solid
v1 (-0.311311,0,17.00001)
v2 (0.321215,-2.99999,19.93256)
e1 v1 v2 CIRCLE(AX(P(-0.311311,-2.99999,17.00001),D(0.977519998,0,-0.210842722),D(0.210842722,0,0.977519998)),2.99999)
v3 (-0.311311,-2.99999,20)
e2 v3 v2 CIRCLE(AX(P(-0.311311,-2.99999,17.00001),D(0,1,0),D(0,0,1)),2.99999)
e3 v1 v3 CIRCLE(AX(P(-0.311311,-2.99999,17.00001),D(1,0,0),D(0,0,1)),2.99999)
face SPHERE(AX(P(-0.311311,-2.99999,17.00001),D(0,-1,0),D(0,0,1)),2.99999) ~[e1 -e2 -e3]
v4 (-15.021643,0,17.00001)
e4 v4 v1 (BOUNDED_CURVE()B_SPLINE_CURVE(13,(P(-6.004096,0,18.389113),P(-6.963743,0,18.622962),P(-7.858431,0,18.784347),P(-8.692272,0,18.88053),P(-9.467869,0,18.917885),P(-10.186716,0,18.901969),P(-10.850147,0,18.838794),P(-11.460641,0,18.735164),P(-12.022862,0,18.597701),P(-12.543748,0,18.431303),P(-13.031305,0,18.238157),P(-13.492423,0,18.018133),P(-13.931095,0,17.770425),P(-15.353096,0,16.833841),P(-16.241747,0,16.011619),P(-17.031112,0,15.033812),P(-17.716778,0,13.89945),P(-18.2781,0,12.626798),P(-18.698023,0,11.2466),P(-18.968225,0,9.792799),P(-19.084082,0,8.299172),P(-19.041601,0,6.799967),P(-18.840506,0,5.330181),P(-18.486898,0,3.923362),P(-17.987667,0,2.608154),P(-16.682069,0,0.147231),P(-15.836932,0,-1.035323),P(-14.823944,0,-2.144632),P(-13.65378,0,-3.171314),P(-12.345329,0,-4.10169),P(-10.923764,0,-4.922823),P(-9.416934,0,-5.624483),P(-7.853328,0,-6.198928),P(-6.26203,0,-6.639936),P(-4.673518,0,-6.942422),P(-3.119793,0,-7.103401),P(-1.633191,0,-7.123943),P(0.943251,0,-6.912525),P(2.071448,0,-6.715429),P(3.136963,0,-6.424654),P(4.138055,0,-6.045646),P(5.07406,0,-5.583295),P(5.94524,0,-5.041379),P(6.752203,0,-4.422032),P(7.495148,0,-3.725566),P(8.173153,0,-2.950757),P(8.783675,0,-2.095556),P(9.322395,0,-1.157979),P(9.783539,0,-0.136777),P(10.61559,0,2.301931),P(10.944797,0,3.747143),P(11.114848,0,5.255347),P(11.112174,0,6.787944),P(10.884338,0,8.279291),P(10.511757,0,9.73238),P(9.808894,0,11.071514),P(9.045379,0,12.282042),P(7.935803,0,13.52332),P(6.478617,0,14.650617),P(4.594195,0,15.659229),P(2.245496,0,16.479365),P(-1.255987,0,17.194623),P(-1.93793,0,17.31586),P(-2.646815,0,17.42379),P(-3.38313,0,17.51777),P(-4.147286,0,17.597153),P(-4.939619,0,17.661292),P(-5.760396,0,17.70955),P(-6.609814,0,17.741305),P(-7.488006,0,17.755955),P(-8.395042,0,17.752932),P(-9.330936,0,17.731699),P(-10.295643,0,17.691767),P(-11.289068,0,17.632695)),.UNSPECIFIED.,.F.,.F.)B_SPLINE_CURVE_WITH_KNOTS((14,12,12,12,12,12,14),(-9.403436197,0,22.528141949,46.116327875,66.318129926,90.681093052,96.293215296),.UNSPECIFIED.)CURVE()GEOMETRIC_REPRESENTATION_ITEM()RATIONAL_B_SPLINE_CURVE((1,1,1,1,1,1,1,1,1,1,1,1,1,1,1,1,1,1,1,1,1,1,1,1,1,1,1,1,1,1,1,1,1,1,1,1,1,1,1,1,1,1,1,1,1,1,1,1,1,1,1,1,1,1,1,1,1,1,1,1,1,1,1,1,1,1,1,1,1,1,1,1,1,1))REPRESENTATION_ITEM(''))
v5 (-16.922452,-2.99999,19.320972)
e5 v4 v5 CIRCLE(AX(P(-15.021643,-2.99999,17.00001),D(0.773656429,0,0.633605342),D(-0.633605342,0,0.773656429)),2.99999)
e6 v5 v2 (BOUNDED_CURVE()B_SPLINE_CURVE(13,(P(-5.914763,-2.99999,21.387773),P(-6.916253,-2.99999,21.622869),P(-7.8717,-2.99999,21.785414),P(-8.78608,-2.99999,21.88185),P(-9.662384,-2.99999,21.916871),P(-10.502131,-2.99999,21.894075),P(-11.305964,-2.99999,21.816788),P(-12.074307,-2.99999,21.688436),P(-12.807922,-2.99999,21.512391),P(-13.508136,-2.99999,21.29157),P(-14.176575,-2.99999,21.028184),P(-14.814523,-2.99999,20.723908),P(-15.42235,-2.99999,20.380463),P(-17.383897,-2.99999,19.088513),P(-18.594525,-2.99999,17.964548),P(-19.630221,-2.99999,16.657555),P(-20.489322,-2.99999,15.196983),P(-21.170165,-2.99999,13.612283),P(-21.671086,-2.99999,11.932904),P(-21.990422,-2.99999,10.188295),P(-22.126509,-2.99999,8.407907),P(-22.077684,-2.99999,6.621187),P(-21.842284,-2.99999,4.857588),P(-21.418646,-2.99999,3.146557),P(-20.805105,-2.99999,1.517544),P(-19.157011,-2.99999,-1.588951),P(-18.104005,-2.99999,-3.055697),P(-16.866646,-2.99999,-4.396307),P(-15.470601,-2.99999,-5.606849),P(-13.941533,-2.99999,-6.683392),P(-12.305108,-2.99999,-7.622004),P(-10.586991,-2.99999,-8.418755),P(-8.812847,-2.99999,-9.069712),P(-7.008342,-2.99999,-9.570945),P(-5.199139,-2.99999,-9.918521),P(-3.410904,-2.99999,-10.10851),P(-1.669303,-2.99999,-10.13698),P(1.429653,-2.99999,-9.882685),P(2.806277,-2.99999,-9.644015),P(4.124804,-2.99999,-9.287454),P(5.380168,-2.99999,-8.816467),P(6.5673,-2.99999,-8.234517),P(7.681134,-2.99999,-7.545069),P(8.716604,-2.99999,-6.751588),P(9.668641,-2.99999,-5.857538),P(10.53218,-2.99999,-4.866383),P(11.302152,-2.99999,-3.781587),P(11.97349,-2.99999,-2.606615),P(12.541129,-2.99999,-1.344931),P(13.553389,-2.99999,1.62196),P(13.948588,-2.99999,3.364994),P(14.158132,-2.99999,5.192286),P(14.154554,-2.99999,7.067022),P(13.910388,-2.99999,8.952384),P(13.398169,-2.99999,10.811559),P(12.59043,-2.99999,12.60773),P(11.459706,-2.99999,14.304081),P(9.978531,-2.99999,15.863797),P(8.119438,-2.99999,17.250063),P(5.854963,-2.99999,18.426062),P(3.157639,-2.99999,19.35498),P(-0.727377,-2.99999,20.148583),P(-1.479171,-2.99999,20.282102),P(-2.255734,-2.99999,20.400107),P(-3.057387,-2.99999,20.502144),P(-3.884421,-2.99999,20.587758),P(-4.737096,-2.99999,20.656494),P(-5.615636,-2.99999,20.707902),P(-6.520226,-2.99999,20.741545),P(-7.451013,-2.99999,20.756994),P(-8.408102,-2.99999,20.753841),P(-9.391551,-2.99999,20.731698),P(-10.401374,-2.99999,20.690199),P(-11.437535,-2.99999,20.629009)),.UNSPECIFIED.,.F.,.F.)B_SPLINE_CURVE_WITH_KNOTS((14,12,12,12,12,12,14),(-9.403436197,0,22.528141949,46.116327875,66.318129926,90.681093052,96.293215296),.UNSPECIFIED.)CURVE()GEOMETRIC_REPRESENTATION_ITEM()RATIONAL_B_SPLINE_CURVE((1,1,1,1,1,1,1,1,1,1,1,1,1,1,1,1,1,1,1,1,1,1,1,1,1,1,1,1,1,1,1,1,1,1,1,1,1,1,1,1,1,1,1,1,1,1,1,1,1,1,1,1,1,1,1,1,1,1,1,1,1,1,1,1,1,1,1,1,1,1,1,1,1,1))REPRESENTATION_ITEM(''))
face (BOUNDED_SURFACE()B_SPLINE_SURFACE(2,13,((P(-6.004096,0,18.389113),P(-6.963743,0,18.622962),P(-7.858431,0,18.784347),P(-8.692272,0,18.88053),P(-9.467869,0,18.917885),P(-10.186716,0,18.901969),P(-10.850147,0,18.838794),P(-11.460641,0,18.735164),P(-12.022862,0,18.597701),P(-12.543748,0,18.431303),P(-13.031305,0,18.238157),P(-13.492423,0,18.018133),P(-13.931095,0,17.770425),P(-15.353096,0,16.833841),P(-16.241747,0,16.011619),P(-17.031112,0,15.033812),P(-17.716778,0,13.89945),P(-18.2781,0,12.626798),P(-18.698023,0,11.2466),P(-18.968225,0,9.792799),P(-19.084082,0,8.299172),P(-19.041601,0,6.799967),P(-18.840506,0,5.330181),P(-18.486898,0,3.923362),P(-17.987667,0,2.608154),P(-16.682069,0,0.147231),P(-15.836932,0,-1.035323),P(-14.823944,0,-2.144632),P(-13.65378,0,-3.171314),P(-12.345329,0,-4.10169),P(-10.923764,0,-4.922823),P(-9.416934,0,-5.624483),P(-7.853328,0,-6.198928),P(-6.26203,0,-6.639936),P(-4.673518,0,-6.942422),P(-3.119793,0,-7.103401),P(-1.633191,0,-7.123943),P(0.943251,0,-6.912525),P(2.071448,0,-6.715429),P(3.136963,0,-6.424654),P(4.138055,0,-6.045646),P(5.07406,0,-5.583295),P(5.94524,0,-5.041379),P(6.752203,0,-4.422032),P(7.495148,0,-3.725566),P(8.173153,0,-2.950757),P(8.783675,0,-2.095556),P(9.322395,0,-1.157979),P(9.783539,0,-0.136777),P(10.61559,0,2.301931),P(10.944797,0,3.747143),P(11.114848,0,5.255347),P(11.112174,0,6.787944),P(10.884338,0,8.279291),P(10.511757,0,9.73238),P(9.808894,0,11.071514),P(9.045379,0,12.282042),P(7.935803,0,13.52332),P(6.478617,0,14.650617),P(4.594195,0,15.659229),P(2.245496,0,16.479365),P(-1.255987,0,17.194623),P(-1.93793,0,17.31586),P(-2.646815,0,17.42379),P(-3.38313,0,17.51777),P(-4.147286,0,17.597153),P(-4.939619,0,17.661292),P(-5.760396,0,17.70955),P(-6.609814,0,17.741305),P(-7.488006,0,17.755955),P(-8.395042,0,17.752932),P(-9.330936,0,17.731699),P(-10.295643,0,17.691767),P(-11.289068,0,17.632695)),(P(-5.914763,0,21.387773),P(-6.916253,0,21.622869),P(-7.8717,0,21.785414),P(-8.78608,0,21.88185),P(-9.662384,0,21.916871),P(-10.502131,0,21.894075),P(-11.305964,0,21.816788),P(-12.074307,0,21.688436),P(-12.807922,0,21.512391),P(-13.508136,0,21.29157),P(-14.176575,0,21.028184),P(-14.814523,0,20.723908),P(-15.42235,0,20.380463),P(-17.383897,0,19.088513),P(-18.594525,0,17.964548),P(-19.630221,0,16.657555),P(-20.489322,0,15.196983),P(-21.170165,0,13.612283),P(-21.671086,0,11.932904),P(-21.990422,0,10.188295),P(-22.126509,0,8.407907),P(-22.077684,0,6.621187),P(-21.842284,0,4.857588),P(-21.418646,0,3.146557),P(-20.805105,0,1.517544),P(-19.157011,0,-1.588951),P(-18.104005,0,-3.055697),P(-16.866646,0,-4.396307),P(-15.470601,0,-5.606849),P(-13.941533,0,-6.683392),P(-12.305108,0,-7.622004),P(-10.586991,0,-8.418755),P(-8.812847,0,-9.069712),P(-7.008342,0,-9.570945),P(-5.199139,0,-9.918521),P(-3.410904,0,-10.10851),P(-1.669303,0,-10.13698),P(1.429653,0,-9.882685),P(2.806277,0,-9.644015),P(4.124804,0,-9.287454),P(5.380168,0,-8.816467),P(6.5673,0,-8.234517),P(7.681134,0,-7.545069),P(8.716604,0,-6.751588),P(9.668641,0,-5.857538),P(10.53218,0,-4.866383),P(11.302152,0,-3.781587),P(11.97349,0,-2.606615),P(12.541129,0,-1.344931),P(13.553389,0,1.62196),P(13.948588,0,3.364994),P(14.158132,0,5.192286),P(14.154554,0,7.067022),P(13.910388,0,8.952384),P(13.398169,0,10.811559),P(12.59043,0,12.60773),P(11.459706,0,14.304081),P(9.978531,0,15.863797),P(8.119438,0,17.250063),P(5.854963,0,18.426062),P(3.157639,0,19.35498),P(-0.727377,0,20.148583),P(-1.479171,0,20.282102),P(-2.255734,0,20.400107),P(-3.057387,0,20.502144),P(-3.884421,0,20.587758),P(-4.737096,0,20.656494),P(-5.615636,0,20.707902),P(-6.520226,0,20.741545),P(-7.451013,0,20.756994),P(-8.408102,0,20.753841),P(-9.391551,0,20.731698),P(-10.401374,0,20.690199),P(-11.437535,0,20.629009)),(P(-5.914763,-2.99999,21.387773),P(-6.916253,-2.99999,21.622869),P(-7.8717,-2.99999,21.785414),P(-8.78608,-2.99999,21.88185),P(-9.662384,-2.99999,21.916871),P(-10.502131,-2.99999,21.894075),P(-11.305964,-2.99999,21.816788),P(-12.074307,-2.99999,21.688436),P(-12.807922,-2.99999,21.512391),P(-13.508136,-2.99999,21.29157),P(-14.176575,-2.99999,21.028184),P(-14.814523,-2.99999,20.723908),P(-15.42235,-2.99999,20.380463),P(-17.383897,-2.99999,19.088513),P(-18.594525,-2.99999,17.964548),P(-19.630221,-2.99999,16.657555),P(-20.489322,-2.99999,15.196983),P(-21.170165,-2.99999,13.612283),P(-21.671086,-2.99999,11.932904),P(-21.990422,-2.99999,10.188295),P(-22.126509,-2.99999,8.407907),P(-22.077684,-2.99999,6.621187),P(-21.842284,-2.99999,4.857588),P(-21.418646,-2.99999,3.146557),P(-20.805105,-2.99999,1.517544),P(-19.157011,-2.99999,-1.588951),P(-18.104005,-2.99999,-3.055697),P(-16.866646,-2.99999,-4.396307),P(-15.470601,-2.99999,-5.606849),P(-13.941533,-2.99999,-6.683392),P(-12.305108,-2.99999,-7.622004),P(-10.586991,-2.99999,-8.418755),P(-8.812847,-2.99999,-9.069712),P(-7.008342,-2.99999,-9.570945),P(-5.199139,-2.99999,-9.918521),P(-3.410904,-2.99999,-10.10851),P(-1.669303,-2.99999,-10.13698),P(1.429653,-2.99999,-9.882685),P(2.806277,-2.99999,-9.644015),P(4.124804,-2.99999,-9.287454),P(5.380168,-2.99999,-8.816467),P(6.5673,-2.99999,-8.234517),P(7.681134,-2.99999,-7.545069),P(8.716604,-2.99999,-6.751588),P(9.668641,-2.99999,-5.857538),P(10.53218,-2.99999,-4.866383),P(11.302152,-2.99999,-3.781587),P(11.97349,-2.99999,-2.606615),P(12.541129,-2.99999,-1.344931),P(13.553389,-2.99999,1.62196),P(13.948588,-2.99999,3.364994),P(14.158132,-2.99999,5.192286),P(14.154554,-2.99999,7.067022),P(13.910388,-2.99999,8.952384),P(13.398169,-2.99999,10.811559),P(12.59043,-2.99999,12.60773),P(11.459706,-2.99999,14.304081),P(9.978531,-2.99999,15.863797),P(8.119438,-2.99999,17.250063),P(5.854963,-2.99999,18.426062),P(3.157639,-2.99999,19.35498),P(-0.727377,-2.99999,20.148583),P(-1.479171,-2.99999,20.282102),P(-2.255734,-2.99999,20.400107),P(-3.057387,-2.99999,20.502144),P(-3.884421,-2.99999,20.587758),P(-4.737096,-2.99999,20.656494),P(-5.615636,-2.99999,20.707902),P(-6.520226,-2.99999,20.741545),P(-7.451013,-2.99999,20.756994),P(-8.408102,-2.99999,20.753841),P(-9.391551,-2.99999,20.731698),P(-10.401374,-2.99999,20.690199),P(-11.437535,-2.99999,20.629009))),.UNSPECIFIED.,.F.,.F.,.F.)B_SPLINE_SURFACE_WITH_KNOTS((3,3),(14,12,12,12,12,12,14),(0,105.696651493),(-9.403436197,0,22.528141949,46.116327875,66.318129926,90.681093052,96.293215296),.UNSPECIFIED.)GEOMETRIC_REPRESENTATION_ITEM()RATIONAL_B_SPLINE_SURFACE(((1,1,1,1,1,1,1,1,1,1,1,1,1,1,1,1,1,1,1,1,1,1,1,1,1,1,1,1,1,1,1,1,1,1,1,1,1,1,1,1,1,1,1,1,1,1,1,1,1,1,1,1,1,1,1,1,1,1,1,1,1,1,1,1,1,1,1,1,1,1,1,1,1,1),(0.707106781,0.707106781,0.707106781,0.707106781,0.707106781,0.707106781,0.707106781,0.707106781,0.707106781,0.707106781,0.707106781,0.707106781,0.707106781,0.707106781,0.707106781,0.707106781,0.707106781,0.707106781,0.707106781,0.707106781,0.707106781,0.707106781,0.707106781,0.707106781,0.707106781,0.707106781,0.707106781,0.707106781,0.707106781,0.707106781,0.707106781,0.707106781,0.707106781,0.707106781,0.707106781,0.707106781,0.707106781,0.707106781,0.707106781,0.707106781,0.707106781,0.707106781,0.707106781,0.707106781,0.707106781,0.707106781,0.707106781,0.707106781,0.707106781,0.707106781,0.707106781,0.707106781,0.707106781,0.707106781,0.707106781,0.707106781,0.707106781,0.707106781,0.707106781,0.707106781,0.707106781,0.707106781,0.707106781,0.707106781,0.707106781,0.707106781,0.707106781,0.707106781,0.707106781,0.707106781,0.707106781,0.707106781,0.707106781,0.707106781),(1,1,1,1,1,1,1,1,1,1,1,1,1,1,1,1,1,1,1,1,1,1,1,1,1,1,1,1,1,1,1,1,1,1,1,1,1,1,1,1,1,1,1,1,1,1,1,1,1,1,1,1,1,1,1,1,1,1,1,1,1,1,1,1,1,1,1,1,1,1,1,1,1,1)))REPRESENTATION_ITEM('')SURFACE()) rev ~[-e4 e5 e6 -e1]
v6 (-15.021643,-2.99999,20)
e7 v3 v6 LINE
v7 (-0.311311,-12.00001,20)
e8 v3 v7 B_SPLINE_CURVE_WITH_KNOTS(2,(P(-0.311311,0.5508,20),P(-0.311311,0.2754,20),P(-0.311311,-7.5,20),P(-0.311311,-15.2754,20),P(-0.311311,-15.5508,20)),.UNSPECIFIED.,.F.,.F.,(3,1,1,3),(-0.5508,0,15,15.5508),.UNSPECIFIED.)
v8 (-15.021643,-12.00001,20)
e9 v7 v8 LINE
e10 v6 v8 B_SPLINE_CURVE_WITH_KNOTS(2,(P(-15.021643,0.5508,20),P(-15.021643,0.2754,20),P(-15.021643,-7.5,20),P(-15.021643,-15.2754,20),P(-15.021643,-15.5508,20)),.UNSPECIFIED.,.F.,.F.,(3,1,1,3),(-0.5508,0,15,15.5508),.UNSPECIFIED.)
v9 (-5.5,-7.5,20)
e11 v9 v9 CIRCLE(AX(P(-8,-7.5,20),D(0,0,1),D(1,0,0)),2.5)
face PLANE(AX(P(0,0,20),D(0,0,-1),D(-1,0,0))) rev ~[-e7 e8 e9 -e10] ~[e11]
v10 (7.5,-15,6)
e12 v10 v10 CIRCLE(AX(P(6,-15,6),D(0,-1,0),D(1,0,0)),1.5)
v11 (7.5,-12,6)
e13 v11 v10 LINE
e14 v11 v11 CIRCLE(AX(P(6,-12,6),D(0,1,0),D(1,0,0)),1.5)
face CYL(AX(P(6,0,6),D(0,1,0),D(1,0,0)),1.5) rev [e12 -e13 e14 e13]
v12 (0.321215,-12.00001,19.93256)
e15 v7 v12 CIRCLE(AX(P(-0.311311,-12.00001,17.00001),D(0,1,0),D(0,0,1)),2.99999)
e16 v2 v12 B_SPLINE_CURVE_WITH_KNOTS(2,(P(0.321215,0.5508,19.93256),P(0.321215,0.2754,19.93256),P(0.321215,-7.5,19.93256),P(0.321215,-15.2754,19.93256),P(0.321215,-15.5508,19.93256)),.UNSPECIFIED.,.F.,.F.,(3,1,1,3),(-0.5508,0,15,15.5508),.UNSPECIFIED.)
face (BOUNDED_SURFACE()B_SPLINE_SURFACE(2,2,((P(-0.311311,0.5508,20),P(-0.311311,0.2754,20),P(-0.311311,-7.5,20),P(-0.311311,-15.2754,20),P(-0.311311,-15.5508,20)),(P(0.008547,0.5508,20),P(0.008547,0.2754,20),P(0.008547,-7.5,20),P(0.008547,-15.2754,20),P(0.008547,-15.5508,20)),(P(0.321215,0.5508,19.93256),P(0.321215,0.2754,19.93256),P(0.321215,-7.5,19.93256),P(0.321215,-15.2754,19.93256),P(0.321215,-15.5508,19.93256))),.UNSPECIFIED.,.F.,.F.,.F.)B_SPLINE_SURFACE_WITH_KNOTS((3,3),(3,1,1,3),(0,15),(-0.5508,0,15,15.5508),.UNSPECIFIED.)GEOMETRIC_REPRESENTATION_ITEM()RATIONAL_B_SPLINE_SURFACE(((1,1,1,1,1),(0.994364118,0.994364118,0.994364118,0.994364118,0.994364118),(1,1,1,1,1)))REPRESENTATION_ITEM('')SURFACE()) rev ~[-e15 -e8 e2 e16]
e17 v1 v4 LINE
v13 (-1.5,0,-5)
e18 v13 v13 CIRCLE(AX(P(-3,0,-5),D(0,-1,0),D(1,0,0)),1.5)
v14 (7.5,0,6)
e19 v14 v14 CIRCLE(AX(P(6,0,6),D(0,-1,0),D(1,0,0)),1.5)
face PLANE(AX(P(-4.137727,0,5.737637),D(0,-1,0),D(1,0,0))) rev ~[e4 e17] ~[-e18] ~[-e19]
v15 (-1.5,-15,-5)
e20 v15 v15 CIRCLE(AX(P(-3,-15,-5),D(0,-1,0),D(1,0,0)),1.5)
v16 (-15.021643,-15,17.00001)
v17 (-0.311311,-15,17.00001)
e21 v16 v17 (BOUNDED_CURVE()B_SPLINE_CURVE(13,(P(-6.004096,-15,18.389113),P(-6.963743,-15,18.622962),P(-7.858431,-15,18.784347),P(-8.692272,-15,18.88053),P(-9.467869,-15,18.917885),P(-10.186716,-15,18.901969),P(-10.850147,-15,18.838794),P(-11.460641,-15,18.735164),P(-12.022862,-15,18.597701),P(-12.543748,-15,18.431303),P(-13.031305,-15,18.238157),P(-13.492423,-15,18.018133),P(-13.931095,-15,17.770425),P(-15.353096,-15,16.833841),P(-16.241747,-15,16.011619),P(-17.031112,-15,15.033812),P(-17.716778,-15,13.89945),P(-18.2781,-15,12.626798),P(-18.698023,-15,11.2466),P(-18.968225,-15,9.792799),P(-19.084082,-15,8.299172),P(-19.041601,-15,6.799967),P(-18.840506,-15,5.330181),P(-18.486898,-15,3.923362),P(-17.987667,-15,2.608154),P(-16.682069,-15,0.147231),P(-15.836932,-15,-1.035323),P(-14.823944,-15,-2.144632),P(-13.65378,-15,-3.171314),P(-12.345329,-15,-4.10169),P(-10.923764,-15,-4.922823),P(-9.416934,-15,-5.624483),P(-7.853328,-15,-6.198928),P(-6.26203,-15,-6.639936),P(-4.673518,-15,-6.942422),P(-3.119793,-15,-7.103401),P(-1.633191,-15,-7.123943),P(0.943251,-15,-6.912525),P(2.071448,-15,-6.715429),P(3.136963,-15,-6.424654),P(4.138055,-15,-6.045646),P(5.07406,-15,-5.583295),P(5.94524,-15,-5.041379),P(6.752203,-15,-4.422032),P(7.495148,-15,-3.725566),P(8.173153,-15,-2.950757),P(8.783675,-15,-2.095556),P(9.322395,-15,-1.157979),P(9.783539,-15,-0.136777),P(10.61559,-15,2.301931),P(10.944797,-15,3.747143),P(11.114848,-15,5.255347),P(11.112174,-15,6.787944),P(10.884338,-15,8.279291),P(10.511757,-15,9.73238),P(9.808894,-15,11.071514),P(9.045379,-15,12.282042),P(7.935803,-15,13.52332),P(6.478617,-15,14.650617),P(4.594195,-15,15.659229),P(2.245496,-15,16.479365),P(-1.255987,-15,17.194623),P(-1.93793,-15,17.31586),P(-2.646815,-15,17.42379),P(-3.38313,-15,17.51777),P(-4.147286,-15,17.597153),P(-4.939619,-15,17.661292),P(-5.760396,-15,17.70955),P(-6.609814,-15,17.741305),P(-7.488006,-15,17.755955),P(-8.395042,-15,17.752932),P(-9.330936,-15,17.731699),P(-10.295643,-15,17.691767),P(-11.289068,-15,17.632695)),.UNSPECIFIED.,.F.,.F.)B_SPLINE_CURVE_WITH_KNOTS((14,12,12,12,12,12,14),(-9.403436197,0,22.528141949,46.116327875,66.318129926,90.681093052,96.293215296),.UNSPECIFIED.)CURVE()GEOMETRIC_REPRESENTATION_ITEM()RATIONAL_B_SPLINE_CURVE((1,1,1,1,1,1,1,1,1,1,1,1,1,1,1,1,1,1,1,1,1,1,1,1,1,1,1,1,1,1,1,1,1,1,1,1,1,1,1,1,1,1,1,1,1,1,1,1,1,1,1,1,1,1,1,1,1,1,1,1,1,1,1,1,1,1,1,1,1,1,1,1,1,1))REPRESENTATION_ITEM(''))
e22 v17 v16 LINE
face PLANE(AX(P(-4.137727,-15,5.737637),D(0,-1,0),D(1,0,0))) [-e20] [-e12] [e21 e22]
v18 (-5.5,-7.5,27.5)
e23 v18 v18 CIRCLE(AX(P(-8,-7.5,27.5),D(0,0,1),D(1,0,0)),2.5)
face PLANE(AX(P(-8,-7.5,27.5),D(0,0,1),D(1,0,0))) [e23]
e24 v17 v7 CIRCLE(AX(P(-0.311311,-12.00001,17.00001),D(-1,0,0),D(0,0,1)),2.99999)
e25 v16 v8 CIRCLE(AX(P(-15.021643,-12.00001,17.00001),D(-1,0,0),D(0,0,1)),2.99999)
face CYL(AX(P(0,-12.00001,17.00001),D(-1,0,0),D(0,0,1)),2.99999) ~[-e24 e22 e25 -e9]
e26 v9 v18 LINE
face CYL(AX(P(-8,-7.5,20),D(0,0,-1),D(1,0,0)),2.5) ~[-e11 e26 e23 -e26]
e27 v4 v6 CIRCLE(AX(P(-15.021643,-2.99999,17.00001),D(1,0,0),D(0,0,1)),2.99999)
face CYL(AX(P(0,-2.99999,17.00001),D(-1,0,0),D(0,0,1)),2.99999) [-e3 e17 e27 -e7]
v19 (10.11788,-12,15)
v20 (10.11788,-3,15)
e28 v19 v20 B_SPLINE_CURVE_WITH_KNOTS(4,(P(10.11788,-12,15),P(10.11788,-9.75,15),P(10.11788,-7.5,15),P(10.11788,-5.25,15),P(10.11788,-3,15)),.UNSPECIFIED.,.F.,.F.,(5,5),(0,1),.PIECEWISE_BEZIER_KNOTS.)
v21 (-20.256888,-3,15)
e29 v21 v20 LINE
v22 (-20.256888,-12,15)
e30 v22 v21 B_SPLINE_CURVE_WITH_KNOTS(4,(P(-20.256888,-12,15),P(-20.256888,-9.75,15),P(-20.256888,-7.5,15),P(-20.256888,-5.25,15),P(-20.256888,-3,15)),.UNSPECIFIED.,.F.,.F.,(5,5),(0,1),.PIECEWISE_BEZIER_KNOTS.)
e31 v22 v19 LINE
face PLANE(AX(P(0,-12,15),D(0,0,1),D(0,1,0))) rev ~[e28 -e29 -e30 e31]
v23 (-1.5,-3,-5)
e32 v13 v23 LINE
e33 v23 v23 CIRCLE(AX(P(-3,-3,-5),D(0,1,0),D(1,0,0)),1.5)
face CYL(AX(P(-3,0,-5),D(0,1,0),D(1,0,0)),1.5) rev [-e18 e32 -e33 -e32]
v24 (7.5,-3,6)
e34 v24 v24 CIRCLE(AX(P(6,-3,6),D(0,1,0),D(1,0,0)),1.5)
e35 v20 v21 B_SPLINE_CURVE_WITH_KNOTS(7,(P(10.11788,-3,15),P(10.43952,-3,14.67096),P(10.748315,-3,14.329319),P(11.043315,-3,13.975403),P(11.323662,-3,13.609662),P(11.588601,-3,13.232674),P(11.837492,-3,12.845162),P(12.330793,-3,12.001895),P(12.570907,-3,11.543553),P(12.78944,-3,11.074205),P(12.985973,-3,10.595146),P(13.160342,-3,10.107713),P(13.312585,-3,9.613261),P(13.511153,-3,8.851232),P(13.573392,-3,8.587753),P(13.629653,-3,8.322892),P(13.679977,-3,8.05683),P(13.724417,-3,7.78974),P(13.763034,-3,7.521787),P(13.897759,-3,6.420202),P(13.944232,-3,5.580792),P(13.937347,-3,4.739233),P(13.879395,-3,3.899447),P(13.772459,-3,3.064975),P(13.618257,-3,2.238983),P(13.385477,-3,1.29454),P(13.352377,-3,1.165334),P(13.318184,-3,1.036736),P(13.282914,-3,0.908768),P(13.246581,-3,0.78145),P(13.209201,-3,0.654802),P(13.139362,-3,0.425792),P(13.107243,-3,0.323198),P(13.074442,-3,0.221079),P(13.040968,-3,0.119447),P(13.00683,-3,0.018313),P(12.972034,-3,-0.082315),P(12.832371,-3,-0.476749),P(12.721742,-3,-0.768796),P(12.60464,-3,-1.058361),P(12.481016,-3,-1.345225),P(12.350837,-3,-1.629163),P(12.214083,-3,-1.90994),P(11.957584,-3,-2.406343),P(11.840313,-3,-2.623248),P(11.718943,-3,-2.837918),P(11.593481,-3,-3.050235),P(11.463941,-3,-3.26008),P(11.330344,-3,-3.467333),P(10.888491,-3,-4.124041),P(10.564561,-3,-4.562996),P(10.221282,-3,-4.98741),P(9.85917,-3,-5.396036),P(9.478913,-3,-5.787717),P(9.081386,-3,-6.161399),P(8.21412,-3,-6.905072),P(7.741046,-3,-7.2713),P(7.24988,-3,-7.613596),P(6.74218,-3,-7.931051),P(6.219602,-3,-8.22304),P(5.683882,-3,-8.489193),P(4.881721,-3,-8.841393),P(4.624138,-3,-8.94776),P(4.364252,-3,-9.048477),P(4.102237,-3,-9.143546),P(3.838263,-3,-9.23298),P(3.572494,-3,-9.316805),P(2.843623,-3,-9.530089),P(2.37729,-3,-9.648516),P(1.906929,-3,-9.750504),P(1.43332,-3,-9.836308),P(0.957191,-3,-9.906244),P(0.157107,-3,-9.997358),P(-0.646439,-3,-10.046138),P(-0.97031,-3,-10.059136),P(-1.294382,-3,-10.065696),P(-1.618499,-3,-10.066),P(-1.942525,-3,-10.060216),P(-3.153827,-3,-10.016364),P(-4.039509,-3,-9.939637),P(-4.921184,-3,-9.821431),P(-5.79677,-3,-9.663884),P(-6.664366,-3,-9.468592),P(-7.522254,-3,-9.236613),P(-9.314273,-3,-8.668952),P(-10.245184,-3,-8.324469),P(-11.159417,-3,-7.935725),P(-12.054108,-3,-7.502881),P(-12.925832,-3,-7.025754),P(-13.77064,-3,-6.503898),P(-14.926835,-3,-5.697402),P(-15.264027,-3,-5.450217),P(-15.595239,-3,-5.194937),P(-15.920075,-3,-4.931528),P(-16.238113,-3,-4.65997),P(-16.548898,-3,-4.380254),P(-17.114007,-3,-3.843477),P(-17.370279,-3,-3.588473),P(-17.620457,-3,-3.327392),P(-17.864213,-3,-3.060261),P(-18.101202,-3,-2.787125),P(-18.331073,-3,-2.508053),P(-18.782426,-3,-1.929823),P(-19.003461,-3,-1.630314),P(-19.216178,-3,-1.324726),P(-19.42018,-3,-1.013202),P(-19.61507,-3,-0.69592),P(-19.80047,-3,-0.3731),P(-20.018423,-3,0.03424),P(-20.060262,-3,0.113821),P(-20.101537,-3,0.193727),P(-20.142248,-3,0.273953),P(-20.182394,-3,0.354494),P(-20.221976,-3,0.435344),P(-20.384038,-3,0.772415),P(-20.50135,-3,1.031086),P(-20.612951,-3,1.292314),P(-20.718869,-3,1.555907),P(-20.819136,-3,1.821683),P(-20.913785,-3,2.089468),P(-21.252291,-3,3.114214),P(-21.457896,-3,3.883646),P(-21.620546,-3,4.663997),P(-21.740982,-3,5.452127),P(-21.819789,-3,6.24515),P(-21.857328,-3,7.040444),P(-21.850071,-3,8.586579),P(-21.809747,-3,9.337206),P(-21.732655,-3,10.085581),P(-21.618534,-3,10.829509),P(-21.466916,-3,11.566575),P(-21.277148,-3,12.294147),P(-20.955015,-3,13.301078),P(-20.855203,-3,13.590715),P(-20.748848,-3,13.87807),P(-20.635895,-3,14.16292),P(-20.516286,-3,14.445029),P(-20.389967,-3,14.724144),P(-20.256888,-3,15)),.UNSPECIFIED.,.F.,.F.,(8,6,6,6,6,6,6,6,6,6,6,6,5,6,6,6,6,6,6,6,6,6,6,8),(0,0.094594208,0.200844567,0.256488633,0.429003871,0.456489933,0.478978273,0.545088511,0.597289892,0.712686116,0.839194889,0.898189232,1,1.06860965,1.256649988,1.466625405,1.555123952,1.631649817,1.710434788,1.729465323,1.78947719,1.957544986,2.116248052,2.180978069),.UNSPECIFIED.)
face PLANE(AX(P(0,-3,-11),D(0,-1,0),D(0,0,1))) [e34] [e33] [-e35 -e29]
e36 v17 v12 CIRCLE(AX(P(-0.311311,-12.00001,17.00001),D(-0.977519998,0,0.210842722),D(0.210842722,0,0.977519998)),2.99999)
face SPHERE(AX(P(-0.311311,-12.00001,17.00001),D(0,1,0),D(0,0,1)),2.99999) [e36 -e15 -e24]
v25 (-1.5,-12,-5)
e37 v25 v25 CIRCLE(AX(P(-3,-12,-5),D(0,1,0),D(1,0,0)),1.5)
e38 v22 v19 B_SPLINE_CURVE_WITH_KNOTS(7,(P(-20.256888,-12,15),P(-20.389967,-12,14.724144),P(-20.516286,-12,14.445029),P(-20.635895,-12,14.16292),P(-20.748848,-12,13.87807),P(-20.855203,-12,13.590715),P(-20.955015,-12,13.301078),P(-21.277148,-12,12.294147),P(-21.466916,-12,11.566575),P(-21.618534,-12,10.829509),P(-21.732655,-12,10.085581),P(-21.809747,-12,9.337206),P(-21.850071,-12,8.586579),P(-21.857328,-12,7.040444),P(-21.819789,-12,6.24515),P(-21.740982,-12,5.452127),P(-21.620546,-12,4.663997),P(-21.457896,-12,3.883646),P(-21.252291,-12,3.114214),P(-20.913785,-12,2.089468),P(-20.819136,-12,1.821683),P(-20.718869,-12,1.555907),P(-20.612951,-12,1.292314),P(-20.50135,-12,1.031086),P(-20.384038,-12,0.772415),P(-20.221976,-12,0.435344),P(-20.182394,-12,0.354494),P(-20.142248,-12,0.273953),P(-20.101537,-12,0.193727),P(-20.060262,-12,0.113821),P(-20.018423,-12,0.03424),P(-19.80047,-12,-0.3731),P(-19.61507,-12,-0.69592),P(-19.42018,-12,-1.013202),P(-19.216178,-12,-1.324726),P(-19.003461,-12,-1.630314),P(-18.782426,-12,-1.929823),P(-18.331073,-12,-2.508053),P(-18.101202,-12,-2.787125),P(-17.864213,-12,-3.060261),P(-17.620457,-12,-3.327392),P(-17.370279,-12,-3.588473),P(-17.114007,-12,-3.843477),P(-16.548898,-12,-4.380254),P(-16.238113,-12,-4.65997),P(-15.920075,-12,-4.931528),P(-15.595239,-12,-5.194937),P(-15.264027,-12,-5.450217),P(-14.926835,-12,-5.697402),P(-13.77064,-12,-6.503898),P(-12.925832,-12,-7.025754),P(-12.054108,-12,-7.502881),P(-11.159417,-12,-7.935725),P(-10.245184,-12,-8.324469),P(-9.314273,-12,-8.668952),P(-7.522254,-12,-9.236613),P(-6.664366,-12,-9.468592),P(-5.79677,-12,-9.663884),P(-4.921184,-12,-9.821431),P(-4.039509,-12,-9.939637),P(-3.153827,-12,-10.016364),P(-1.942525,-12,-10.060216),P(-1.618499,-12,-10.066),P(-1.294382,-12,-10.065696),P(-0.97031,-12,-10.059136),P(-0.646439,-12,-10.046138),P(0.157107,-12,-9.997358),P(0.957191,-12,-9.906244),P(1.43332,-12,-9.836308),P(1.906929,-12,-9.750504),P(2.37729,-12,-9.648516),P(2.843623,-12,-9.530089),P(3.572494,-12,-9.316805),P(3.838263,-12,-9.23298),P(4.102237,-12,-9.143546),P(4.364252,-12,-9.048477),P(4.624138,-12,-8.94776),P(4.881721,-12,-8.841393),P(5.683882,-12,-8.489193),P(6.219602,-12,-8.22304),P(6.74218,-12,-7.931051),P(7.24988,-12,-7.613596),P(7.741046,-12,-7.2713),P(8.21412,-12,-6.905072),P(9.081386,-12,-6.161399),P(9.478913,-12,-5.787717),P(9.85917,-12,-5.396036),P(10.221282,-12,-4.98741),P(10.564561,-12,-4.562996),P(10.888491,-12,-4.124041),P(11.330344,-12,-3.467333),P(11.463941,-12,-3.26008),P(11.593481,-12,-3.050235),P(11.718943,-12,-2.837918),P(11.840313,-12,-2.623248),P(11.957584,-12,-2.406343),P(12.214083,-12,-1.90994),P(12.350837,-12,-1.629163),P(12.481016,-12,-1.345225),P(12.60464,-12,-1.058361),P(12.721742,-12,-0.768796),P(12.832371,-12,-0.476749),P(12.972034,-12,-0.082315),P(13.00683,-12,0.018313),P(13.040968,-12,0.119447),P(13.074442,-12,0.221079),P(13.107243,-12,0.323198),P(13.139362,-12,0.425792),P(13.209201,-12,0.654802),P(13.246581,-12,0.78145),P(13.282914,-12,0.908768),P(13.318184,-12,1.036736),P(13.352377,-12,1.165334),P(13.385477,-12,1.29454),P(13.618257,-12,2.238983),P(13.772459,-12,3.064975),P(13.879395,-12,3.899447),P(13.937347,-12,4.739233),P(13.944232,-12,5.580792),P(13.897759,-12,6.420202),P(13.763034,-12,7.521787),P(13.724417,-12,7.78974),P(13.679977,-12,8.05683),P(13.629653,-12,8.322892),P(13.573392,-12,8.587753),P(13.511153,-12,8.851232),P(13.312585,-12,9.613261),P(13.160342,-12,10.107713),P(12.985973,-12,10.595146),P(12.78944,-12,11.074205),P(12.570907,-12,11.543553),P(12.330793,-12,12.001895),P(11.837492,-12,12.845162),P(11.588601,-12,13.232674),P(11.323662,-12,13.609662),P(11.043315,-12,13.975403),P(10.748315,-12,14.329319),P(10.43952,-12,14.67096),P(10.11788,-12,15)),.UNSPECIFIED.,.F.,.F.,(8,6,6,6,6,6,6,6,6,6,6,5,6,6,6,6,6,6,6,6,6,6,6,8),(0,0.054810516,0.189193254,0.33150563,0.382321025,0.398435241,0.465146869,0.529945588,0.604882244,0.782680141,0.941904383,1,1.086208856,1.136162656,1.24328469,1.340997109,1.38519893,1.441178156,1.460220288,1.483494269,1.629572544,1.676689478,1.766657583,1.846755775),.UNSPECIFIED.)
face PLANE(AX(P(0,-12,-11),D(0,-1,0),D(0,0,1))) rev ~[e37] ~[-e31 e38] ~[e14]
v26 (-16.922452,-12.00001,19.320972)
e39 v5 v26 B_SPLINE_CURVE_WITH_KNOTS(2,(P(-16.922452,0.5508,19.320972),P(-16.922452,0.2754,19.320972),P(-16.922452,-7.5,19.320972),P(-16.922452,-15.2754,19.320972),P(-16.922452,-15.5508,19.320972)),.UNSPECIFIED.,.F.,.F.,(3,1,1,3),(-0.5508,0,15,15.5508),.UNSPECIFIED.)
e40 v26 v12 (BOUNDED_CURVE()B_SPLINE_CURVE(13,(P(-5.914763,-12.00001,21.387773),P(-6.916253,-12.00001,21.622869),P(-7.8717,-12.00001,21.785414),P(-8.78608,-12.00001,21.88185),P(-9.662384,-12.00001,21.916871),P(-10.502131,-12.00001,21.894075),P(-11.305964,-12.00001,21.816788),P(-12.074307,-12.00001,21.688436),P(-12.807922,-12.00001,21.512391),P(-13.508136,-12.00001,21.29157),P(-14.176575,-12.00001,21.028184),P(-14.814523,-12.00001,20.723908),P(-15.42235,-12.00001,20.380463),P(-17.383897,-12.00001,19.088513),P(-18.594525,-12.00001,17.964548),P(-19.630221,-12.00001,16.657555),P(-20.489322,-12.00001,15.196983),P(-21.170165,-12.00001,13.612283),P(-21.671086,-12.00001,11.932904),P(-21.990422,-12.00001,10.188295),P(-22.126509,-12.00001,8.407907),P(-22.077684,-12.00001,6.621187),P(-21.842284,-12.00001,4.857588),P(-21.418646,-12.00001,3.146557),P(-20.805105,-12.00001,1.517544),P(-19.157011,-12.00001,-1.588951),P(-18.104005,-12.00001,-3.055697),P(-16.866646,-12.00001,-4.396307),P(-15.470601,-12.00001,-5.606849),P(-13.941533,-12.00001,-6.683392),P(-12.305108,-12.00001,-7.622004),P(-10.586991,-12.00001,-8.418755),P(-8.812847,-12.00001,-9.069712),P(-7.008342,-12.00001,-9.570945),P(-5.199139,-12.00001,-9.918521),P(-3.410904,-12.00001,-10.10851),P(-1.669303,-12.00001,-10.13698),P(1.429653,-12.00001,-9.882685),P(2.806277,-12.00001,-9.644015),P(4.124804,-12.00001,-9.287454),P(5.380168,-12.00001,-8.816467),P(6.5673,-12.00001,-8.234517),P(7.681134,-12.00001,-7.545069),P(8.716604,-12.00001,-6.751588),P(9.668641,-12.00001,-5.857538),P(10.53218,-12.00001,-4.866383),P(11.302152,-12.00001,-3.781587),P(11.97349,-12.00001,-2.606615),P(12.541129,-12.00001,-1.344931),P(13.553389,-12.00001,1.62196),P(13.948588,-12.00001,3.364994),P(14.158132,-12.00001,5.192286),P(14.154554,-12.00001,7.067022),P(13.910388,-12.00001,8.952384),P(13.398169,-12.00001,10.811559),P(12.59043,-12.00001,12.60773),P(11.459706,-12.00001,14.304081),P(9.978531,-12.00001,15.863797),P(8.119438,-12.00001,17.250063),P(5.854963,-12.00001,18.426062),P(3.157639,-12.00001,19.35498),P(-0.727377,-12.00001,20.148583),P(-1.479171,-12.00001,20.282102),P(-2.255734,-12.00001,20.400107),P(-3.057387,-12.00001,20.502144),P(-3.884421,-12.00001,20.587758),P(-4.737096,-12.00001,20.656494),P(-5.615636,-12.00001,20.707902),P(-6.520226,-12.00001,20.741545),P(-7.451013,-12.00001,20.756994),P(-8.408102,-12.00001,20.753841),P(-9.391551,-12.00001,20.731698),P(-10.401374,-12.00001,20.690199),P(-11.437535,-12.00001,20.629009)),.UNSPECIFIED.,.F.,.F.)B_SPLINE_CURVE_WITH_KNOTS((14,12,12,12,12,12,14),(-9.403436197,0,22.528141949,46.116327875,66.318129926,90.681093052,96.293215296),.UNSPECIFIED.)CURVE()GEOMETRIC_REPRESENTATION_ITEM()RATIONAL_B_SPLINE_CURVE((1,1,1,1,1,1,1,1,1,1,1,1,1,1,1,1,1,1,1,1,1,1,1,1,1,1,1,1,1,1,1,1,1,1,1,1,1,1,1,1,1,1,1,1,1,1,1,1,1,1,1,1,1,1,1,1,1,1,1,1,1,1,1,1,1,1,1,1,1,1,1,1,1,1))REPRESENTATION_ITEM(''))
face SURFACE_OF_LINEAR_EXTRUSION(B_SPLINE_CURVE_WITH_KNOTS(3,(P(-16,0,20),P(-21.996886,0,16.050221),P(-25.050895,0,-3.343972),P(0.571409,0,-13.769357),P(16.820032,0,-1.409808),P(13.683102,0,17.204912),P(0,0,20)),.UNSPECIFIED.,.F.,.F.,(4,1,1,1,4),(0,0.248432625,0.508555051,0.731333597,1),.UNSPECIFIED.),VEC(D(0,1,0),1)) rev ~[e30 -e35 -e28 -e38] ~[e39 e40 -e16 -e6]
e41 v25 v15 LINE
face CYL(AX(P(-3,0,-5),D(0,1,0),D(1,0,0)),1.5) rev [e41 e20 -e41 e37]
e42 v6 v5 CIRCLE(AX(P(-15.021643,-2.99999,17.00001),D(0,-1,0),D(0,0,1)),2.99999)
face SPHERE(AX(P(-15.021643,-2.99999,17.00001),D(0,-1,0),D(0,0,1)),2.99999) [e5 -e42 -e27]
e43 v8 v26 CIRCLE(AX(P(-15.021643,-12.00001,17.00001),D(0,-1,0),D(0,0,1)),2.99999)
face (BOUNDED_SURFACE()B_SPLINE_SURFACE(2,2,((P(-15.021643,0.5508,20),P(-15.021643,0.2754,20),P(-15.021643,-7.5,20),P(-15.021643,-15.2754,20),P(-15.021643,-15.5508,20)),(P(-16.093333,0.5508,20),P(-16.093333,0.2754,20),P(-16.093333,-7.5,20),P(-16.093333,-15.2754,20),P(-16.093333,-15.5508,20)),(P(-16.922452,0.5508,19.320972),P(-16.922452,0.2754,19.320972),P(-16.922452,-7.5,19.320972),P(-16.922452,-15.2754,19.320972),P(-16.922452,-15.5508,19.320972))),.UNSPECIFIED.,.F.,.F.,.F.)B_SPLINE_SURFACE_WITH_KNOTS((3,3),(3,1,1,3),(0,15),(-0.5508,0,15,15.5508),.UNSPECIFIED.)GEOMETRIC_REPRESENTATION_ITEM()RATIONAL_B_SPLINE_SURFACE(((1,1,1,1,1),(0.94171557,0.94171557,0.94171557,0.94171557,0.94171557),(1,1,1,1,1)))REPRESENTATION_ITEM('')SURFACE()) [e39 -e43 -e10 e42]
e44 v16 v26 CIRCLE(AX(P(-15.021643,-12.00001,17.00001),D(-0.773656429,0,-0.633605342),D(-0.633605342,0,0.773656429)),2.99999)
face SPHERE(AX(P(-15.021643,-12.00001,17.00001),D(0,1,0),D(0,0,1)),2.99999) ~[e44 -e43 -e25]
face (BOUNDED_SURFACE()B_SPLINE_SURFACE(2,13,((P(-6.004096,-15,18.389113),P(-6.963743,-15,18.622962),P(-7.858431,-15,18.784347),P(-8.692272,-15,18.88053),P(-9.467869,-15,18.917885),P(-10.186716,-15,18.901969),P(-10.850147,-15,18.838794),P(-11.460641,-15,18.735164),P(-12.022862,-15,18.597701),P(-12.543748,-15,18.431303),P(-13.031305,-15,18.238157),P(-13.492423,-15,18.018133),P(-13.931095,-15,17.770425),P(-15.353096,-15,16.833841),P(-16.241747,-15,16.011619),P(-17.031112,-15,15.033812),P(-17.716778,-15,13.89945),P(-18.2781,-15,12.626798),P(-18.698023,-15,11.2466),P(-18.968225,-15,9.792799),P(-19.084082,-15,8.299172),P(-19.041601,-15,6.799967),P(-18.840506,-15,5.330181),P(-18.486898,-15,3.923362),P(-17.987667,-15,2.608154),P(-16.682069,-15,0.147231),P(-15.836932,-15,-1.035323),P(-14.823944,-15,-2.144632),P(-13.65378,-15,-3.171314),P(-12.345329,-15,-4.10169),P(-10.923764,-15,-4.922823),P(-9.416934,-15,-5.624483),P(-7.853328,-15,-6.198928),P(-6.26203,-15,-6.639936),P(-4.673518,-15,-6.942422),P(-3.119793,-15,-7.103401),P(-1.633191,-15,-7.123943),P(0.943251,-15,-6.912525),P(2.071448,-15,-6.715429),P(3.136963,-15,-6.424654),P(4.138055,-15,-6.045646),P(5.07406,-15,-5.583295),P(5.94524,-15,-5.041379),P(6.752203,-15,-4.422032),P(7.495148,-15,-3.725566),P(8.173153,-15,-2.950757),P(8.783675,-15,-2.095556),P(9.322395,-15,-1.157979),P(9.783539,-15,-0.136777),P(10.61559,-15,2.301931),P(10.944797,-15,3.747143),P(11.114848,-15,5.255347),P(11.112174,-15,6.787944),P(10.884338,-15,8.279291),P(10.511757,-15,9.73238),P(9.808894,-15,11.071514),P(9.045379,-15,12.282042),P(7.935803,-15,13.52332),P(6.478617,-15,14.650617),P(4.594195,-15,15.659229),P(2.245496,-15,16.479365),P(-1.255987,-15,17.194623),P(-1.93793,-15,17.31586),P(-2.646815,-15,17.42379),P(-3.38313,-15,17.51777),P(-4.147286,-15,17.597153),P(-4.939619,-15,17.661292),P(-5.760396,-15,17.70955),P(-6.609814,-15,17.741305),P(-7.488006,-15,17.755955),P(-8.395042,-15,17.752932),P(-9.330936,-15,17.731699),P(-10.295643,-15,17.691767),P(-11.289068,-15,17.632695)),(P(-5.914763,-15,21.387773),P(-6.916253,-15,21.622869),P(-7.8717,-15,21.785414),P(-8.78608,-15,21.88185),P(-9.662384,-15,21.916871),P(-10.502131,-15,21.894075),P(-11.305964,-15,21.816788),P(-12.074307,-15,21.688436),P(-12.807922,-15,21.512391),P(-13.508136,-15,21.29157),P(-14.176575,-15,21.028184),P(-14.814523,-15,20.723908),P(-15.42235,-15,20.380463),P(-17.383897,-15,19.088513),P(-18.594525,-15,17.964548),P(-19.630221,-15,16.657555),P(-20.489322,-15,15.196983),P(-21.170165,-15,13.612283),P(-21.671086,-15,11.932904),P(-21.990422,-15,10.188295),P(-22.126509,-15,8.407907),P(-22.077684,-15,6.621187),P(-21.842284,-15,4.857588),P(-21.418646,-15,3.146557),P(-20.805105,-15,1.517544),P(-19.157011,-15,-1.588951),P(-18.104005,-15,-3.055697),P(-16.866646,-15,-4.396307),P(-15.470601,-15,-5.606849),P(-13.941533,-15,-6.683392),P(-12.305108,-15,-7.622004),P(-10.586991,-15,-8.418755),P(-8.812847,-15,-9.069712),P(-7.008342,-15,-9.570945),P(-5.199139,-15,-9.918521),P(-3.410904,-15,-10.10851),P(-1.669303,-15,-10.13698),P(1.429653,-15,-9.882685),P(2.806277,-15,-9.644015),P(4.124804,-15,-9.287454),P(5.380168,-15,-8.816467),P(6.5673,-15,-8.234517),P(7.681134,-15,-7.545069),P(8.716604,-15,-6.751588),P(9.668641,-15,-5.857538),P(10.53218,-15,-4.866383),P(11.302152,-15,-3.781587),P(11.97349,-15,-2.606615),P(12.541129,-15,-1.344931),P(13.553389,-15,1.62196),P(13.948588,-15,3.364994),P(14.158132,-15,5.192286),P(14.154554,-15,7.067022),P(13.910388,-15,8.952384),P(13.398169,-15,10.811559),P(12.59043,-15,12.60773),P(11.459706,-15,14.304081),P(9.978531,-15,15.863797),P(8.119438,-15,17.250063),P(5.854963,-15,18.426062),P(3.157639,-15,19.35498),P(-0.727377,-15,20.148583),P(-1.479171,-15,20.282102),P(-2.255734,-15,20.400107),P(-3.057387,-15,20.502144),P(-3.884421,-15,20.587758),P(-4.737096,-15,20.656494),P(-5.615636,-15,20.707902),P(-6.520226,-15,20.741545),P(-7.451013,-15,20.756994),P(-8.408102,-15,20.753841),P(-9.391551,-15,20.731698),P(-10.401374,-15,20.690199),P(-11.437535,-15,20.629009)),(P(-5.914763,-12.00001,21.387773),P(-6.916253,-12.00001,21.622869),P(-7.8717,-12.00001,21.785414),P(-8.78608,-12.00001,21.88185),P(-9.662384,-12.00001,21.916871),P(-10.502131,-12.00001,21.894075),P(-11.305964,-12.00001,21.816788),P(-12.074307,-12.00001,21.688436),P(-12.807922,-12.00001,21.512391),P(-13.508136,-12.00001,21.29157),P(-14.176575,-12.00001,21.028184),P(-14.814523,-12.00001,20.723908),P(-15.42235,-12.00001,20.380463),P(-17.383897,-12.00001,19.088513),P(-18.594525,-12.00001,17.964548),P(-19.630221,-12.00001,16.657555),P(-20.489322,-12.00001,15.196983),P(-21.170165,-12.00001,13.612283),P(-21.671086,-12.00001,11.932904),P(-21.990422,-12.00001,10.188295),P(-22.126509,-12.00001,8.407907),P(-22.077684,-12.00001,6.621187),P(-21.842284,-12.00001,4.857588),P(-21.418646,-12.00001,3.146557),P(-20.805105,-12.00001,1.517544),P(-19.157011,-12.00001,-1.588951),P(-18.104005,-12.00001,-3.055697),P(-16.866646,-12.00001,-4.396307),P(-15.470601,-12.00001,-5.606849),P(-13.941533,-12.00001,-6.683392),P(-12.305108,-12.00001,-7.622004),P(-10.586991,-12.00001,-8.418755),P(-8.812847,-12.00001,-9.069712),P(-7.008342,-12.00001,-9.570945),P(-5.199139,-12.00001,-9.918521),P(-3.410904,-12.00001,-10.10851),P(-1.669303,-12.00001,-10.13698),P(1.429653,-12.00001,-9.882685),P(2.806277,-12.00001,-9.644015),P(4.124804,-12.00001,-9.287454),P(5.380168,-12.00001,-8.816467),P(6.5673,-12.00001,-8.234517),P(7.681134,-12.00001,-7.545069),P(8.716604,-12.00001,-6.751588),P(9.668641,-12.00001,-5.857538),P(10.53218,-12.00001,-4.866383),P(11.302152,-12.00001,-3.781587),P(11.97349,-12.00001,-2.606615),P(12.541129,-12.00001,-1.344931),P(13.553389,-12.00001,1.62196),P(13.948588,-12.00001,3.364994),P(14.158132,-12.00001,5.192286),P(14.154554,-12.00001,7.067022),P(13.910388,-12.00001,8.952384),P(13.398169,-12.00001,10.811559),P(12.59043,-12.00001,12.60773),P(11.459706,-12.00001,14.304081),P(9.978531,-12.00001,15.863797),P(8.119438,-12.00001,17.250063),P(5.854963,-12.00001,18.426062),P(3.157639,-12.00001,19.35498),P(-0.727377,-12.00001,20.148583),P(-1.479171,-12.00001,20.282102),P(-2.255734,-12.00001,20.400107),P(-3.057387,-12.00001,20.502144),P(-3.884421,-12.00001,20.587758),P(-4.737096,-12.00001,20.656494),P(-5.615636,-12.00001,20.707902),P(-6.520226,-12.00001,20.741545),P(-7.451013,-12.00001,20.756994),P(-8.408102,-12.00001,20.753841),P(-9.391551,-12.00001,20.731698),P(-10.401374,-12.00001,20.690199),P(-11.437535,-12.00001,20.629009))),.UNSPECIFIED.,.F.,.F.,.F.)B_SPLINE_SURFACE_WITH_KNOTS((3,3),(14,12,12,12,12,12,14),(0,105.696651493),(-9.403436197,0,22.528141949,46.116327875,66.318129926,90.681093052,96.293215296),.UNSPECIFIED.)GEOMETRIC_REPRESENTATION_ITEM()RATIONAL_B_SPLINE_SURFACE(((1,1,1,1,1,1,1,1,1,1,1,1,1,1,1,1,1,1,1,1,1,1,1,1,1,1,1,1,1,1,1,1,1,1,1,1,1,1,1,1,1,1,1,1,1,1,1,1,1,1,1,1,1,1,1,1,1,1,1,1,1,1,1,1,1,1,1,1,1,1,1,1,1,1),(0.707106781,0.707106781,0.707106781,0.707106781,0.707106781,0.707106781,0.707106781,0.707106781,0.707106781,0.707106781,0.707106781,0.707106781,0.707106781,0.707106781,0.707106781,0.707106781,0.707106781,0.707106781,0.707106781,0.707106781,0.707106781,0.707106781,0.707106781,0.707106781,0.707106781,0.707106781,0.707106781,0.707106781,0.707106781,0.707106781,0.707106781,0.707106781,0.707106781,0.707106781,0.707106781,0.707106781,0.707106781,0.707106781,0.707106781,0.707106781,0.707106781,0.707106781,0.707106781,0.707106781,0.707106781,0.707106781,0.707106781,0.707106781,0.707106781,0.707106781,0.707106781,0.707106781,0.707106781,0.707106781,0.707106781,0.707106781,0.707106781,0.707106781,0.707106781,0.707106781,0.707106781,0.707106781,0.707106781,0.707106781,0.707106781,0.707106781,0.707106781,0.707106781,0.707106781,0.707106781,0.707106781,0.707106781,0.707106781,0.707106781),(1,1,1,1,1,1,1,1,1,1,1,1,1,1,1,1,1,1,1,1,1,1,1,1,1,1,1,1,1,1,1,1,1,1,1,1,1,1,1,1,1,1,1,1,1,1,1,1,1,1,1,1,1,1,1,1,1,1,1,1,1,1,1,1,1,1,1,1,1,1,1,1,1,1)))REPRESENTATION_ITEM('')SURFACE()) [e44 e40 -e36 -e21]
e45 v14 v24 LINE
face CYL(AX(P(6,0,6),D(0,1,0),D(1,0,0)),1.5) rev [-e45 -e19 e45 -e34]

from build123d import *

# Parameters (mm, degrees)
F0_R     = 1.5
F1_DEPTH = 15
F2_R     = 2.5
F3_DEPTH = 7.5
F4_W     = 9
F4_H     = 26
F5_DEPTH = 25
F6_DEPTH = 25
F7_R     = 2.99999


# Not quite as in the source:
# - a fillet or chamfer is up to 0.001 mm smaller than in the source, because OpenCascade refuses the exact size


with BuildPart() as f1:
    # F0 (on Front) → F1 (new body)
    with BuildSketch(Plane.XZ):
        with BuildLine():
            Line((0, 20), (-16, 20))
            add(Edge.make_bspline(
                [(-16, 20), (-21.9968855381, 16.0502213985), (-25.0508954103, -3.343971526), (0.5714094097, -13.7693570255), (16.8200319307, -1.4098083557), (13.6831020936, 17.2049123794), (0, 20)],
                knots=[0, 0, 0, 0, 0.2484326246, 0.5085550507, 0.7313335966, 1, 1, 1, 1], degree=3))
        make_face()
        with Locations((-3, -5)):
            Circle(F0_R, mode=Mode.SUBTRACT)
        with Locations((6, 6)):
            Circle(F0_R, mode=Mode.SUBTRACT)
    extrude(amount=F1_DEPTH)

    # F2 (on face) → F3 (join)
    with BuildSketch(Plane.XY.offset(20)):
        with Locations((-8, -7.5)):
            Circle(F2_R)
    extrude(amount=F3_DEPTH)

    # F4 (on Right) → F5 (cut)
    with BuildSketch(Plane.YZ):
        with Locations((-7.5, 2)):
            Rectangle(F4_W, F4_H)
    extrude(amount=-F5_DEPTH, mode=Mode.SUBTRACT)

    # F4 (on Right) → F6 (cut)
    with BuildSketch(Plane.YZ):
        with Locations((-7.5, 2)):
            Rectangle(F4_W, F4_H)
    extrude(amount=F6_DEPTH, mode=Mode.SUBTRACT)

    # F7 (radius 3 in the source; OpenCascade refuses exactly that, so slightly less here)
    f7_edges = [f1.edges().sort_by_distance(p)[0] for p in [
        (-8, -15, 20),
        (-8, 0, 20),
        (-0.375905, 0, -10.026879),
        (-0.375905, -15, -10.026879),
        (-16, -7.5, 20),
        (0, -7.5, 20),
    ]]
    fillet(f7_edges, radius=F7_R)


solid = f1.part
